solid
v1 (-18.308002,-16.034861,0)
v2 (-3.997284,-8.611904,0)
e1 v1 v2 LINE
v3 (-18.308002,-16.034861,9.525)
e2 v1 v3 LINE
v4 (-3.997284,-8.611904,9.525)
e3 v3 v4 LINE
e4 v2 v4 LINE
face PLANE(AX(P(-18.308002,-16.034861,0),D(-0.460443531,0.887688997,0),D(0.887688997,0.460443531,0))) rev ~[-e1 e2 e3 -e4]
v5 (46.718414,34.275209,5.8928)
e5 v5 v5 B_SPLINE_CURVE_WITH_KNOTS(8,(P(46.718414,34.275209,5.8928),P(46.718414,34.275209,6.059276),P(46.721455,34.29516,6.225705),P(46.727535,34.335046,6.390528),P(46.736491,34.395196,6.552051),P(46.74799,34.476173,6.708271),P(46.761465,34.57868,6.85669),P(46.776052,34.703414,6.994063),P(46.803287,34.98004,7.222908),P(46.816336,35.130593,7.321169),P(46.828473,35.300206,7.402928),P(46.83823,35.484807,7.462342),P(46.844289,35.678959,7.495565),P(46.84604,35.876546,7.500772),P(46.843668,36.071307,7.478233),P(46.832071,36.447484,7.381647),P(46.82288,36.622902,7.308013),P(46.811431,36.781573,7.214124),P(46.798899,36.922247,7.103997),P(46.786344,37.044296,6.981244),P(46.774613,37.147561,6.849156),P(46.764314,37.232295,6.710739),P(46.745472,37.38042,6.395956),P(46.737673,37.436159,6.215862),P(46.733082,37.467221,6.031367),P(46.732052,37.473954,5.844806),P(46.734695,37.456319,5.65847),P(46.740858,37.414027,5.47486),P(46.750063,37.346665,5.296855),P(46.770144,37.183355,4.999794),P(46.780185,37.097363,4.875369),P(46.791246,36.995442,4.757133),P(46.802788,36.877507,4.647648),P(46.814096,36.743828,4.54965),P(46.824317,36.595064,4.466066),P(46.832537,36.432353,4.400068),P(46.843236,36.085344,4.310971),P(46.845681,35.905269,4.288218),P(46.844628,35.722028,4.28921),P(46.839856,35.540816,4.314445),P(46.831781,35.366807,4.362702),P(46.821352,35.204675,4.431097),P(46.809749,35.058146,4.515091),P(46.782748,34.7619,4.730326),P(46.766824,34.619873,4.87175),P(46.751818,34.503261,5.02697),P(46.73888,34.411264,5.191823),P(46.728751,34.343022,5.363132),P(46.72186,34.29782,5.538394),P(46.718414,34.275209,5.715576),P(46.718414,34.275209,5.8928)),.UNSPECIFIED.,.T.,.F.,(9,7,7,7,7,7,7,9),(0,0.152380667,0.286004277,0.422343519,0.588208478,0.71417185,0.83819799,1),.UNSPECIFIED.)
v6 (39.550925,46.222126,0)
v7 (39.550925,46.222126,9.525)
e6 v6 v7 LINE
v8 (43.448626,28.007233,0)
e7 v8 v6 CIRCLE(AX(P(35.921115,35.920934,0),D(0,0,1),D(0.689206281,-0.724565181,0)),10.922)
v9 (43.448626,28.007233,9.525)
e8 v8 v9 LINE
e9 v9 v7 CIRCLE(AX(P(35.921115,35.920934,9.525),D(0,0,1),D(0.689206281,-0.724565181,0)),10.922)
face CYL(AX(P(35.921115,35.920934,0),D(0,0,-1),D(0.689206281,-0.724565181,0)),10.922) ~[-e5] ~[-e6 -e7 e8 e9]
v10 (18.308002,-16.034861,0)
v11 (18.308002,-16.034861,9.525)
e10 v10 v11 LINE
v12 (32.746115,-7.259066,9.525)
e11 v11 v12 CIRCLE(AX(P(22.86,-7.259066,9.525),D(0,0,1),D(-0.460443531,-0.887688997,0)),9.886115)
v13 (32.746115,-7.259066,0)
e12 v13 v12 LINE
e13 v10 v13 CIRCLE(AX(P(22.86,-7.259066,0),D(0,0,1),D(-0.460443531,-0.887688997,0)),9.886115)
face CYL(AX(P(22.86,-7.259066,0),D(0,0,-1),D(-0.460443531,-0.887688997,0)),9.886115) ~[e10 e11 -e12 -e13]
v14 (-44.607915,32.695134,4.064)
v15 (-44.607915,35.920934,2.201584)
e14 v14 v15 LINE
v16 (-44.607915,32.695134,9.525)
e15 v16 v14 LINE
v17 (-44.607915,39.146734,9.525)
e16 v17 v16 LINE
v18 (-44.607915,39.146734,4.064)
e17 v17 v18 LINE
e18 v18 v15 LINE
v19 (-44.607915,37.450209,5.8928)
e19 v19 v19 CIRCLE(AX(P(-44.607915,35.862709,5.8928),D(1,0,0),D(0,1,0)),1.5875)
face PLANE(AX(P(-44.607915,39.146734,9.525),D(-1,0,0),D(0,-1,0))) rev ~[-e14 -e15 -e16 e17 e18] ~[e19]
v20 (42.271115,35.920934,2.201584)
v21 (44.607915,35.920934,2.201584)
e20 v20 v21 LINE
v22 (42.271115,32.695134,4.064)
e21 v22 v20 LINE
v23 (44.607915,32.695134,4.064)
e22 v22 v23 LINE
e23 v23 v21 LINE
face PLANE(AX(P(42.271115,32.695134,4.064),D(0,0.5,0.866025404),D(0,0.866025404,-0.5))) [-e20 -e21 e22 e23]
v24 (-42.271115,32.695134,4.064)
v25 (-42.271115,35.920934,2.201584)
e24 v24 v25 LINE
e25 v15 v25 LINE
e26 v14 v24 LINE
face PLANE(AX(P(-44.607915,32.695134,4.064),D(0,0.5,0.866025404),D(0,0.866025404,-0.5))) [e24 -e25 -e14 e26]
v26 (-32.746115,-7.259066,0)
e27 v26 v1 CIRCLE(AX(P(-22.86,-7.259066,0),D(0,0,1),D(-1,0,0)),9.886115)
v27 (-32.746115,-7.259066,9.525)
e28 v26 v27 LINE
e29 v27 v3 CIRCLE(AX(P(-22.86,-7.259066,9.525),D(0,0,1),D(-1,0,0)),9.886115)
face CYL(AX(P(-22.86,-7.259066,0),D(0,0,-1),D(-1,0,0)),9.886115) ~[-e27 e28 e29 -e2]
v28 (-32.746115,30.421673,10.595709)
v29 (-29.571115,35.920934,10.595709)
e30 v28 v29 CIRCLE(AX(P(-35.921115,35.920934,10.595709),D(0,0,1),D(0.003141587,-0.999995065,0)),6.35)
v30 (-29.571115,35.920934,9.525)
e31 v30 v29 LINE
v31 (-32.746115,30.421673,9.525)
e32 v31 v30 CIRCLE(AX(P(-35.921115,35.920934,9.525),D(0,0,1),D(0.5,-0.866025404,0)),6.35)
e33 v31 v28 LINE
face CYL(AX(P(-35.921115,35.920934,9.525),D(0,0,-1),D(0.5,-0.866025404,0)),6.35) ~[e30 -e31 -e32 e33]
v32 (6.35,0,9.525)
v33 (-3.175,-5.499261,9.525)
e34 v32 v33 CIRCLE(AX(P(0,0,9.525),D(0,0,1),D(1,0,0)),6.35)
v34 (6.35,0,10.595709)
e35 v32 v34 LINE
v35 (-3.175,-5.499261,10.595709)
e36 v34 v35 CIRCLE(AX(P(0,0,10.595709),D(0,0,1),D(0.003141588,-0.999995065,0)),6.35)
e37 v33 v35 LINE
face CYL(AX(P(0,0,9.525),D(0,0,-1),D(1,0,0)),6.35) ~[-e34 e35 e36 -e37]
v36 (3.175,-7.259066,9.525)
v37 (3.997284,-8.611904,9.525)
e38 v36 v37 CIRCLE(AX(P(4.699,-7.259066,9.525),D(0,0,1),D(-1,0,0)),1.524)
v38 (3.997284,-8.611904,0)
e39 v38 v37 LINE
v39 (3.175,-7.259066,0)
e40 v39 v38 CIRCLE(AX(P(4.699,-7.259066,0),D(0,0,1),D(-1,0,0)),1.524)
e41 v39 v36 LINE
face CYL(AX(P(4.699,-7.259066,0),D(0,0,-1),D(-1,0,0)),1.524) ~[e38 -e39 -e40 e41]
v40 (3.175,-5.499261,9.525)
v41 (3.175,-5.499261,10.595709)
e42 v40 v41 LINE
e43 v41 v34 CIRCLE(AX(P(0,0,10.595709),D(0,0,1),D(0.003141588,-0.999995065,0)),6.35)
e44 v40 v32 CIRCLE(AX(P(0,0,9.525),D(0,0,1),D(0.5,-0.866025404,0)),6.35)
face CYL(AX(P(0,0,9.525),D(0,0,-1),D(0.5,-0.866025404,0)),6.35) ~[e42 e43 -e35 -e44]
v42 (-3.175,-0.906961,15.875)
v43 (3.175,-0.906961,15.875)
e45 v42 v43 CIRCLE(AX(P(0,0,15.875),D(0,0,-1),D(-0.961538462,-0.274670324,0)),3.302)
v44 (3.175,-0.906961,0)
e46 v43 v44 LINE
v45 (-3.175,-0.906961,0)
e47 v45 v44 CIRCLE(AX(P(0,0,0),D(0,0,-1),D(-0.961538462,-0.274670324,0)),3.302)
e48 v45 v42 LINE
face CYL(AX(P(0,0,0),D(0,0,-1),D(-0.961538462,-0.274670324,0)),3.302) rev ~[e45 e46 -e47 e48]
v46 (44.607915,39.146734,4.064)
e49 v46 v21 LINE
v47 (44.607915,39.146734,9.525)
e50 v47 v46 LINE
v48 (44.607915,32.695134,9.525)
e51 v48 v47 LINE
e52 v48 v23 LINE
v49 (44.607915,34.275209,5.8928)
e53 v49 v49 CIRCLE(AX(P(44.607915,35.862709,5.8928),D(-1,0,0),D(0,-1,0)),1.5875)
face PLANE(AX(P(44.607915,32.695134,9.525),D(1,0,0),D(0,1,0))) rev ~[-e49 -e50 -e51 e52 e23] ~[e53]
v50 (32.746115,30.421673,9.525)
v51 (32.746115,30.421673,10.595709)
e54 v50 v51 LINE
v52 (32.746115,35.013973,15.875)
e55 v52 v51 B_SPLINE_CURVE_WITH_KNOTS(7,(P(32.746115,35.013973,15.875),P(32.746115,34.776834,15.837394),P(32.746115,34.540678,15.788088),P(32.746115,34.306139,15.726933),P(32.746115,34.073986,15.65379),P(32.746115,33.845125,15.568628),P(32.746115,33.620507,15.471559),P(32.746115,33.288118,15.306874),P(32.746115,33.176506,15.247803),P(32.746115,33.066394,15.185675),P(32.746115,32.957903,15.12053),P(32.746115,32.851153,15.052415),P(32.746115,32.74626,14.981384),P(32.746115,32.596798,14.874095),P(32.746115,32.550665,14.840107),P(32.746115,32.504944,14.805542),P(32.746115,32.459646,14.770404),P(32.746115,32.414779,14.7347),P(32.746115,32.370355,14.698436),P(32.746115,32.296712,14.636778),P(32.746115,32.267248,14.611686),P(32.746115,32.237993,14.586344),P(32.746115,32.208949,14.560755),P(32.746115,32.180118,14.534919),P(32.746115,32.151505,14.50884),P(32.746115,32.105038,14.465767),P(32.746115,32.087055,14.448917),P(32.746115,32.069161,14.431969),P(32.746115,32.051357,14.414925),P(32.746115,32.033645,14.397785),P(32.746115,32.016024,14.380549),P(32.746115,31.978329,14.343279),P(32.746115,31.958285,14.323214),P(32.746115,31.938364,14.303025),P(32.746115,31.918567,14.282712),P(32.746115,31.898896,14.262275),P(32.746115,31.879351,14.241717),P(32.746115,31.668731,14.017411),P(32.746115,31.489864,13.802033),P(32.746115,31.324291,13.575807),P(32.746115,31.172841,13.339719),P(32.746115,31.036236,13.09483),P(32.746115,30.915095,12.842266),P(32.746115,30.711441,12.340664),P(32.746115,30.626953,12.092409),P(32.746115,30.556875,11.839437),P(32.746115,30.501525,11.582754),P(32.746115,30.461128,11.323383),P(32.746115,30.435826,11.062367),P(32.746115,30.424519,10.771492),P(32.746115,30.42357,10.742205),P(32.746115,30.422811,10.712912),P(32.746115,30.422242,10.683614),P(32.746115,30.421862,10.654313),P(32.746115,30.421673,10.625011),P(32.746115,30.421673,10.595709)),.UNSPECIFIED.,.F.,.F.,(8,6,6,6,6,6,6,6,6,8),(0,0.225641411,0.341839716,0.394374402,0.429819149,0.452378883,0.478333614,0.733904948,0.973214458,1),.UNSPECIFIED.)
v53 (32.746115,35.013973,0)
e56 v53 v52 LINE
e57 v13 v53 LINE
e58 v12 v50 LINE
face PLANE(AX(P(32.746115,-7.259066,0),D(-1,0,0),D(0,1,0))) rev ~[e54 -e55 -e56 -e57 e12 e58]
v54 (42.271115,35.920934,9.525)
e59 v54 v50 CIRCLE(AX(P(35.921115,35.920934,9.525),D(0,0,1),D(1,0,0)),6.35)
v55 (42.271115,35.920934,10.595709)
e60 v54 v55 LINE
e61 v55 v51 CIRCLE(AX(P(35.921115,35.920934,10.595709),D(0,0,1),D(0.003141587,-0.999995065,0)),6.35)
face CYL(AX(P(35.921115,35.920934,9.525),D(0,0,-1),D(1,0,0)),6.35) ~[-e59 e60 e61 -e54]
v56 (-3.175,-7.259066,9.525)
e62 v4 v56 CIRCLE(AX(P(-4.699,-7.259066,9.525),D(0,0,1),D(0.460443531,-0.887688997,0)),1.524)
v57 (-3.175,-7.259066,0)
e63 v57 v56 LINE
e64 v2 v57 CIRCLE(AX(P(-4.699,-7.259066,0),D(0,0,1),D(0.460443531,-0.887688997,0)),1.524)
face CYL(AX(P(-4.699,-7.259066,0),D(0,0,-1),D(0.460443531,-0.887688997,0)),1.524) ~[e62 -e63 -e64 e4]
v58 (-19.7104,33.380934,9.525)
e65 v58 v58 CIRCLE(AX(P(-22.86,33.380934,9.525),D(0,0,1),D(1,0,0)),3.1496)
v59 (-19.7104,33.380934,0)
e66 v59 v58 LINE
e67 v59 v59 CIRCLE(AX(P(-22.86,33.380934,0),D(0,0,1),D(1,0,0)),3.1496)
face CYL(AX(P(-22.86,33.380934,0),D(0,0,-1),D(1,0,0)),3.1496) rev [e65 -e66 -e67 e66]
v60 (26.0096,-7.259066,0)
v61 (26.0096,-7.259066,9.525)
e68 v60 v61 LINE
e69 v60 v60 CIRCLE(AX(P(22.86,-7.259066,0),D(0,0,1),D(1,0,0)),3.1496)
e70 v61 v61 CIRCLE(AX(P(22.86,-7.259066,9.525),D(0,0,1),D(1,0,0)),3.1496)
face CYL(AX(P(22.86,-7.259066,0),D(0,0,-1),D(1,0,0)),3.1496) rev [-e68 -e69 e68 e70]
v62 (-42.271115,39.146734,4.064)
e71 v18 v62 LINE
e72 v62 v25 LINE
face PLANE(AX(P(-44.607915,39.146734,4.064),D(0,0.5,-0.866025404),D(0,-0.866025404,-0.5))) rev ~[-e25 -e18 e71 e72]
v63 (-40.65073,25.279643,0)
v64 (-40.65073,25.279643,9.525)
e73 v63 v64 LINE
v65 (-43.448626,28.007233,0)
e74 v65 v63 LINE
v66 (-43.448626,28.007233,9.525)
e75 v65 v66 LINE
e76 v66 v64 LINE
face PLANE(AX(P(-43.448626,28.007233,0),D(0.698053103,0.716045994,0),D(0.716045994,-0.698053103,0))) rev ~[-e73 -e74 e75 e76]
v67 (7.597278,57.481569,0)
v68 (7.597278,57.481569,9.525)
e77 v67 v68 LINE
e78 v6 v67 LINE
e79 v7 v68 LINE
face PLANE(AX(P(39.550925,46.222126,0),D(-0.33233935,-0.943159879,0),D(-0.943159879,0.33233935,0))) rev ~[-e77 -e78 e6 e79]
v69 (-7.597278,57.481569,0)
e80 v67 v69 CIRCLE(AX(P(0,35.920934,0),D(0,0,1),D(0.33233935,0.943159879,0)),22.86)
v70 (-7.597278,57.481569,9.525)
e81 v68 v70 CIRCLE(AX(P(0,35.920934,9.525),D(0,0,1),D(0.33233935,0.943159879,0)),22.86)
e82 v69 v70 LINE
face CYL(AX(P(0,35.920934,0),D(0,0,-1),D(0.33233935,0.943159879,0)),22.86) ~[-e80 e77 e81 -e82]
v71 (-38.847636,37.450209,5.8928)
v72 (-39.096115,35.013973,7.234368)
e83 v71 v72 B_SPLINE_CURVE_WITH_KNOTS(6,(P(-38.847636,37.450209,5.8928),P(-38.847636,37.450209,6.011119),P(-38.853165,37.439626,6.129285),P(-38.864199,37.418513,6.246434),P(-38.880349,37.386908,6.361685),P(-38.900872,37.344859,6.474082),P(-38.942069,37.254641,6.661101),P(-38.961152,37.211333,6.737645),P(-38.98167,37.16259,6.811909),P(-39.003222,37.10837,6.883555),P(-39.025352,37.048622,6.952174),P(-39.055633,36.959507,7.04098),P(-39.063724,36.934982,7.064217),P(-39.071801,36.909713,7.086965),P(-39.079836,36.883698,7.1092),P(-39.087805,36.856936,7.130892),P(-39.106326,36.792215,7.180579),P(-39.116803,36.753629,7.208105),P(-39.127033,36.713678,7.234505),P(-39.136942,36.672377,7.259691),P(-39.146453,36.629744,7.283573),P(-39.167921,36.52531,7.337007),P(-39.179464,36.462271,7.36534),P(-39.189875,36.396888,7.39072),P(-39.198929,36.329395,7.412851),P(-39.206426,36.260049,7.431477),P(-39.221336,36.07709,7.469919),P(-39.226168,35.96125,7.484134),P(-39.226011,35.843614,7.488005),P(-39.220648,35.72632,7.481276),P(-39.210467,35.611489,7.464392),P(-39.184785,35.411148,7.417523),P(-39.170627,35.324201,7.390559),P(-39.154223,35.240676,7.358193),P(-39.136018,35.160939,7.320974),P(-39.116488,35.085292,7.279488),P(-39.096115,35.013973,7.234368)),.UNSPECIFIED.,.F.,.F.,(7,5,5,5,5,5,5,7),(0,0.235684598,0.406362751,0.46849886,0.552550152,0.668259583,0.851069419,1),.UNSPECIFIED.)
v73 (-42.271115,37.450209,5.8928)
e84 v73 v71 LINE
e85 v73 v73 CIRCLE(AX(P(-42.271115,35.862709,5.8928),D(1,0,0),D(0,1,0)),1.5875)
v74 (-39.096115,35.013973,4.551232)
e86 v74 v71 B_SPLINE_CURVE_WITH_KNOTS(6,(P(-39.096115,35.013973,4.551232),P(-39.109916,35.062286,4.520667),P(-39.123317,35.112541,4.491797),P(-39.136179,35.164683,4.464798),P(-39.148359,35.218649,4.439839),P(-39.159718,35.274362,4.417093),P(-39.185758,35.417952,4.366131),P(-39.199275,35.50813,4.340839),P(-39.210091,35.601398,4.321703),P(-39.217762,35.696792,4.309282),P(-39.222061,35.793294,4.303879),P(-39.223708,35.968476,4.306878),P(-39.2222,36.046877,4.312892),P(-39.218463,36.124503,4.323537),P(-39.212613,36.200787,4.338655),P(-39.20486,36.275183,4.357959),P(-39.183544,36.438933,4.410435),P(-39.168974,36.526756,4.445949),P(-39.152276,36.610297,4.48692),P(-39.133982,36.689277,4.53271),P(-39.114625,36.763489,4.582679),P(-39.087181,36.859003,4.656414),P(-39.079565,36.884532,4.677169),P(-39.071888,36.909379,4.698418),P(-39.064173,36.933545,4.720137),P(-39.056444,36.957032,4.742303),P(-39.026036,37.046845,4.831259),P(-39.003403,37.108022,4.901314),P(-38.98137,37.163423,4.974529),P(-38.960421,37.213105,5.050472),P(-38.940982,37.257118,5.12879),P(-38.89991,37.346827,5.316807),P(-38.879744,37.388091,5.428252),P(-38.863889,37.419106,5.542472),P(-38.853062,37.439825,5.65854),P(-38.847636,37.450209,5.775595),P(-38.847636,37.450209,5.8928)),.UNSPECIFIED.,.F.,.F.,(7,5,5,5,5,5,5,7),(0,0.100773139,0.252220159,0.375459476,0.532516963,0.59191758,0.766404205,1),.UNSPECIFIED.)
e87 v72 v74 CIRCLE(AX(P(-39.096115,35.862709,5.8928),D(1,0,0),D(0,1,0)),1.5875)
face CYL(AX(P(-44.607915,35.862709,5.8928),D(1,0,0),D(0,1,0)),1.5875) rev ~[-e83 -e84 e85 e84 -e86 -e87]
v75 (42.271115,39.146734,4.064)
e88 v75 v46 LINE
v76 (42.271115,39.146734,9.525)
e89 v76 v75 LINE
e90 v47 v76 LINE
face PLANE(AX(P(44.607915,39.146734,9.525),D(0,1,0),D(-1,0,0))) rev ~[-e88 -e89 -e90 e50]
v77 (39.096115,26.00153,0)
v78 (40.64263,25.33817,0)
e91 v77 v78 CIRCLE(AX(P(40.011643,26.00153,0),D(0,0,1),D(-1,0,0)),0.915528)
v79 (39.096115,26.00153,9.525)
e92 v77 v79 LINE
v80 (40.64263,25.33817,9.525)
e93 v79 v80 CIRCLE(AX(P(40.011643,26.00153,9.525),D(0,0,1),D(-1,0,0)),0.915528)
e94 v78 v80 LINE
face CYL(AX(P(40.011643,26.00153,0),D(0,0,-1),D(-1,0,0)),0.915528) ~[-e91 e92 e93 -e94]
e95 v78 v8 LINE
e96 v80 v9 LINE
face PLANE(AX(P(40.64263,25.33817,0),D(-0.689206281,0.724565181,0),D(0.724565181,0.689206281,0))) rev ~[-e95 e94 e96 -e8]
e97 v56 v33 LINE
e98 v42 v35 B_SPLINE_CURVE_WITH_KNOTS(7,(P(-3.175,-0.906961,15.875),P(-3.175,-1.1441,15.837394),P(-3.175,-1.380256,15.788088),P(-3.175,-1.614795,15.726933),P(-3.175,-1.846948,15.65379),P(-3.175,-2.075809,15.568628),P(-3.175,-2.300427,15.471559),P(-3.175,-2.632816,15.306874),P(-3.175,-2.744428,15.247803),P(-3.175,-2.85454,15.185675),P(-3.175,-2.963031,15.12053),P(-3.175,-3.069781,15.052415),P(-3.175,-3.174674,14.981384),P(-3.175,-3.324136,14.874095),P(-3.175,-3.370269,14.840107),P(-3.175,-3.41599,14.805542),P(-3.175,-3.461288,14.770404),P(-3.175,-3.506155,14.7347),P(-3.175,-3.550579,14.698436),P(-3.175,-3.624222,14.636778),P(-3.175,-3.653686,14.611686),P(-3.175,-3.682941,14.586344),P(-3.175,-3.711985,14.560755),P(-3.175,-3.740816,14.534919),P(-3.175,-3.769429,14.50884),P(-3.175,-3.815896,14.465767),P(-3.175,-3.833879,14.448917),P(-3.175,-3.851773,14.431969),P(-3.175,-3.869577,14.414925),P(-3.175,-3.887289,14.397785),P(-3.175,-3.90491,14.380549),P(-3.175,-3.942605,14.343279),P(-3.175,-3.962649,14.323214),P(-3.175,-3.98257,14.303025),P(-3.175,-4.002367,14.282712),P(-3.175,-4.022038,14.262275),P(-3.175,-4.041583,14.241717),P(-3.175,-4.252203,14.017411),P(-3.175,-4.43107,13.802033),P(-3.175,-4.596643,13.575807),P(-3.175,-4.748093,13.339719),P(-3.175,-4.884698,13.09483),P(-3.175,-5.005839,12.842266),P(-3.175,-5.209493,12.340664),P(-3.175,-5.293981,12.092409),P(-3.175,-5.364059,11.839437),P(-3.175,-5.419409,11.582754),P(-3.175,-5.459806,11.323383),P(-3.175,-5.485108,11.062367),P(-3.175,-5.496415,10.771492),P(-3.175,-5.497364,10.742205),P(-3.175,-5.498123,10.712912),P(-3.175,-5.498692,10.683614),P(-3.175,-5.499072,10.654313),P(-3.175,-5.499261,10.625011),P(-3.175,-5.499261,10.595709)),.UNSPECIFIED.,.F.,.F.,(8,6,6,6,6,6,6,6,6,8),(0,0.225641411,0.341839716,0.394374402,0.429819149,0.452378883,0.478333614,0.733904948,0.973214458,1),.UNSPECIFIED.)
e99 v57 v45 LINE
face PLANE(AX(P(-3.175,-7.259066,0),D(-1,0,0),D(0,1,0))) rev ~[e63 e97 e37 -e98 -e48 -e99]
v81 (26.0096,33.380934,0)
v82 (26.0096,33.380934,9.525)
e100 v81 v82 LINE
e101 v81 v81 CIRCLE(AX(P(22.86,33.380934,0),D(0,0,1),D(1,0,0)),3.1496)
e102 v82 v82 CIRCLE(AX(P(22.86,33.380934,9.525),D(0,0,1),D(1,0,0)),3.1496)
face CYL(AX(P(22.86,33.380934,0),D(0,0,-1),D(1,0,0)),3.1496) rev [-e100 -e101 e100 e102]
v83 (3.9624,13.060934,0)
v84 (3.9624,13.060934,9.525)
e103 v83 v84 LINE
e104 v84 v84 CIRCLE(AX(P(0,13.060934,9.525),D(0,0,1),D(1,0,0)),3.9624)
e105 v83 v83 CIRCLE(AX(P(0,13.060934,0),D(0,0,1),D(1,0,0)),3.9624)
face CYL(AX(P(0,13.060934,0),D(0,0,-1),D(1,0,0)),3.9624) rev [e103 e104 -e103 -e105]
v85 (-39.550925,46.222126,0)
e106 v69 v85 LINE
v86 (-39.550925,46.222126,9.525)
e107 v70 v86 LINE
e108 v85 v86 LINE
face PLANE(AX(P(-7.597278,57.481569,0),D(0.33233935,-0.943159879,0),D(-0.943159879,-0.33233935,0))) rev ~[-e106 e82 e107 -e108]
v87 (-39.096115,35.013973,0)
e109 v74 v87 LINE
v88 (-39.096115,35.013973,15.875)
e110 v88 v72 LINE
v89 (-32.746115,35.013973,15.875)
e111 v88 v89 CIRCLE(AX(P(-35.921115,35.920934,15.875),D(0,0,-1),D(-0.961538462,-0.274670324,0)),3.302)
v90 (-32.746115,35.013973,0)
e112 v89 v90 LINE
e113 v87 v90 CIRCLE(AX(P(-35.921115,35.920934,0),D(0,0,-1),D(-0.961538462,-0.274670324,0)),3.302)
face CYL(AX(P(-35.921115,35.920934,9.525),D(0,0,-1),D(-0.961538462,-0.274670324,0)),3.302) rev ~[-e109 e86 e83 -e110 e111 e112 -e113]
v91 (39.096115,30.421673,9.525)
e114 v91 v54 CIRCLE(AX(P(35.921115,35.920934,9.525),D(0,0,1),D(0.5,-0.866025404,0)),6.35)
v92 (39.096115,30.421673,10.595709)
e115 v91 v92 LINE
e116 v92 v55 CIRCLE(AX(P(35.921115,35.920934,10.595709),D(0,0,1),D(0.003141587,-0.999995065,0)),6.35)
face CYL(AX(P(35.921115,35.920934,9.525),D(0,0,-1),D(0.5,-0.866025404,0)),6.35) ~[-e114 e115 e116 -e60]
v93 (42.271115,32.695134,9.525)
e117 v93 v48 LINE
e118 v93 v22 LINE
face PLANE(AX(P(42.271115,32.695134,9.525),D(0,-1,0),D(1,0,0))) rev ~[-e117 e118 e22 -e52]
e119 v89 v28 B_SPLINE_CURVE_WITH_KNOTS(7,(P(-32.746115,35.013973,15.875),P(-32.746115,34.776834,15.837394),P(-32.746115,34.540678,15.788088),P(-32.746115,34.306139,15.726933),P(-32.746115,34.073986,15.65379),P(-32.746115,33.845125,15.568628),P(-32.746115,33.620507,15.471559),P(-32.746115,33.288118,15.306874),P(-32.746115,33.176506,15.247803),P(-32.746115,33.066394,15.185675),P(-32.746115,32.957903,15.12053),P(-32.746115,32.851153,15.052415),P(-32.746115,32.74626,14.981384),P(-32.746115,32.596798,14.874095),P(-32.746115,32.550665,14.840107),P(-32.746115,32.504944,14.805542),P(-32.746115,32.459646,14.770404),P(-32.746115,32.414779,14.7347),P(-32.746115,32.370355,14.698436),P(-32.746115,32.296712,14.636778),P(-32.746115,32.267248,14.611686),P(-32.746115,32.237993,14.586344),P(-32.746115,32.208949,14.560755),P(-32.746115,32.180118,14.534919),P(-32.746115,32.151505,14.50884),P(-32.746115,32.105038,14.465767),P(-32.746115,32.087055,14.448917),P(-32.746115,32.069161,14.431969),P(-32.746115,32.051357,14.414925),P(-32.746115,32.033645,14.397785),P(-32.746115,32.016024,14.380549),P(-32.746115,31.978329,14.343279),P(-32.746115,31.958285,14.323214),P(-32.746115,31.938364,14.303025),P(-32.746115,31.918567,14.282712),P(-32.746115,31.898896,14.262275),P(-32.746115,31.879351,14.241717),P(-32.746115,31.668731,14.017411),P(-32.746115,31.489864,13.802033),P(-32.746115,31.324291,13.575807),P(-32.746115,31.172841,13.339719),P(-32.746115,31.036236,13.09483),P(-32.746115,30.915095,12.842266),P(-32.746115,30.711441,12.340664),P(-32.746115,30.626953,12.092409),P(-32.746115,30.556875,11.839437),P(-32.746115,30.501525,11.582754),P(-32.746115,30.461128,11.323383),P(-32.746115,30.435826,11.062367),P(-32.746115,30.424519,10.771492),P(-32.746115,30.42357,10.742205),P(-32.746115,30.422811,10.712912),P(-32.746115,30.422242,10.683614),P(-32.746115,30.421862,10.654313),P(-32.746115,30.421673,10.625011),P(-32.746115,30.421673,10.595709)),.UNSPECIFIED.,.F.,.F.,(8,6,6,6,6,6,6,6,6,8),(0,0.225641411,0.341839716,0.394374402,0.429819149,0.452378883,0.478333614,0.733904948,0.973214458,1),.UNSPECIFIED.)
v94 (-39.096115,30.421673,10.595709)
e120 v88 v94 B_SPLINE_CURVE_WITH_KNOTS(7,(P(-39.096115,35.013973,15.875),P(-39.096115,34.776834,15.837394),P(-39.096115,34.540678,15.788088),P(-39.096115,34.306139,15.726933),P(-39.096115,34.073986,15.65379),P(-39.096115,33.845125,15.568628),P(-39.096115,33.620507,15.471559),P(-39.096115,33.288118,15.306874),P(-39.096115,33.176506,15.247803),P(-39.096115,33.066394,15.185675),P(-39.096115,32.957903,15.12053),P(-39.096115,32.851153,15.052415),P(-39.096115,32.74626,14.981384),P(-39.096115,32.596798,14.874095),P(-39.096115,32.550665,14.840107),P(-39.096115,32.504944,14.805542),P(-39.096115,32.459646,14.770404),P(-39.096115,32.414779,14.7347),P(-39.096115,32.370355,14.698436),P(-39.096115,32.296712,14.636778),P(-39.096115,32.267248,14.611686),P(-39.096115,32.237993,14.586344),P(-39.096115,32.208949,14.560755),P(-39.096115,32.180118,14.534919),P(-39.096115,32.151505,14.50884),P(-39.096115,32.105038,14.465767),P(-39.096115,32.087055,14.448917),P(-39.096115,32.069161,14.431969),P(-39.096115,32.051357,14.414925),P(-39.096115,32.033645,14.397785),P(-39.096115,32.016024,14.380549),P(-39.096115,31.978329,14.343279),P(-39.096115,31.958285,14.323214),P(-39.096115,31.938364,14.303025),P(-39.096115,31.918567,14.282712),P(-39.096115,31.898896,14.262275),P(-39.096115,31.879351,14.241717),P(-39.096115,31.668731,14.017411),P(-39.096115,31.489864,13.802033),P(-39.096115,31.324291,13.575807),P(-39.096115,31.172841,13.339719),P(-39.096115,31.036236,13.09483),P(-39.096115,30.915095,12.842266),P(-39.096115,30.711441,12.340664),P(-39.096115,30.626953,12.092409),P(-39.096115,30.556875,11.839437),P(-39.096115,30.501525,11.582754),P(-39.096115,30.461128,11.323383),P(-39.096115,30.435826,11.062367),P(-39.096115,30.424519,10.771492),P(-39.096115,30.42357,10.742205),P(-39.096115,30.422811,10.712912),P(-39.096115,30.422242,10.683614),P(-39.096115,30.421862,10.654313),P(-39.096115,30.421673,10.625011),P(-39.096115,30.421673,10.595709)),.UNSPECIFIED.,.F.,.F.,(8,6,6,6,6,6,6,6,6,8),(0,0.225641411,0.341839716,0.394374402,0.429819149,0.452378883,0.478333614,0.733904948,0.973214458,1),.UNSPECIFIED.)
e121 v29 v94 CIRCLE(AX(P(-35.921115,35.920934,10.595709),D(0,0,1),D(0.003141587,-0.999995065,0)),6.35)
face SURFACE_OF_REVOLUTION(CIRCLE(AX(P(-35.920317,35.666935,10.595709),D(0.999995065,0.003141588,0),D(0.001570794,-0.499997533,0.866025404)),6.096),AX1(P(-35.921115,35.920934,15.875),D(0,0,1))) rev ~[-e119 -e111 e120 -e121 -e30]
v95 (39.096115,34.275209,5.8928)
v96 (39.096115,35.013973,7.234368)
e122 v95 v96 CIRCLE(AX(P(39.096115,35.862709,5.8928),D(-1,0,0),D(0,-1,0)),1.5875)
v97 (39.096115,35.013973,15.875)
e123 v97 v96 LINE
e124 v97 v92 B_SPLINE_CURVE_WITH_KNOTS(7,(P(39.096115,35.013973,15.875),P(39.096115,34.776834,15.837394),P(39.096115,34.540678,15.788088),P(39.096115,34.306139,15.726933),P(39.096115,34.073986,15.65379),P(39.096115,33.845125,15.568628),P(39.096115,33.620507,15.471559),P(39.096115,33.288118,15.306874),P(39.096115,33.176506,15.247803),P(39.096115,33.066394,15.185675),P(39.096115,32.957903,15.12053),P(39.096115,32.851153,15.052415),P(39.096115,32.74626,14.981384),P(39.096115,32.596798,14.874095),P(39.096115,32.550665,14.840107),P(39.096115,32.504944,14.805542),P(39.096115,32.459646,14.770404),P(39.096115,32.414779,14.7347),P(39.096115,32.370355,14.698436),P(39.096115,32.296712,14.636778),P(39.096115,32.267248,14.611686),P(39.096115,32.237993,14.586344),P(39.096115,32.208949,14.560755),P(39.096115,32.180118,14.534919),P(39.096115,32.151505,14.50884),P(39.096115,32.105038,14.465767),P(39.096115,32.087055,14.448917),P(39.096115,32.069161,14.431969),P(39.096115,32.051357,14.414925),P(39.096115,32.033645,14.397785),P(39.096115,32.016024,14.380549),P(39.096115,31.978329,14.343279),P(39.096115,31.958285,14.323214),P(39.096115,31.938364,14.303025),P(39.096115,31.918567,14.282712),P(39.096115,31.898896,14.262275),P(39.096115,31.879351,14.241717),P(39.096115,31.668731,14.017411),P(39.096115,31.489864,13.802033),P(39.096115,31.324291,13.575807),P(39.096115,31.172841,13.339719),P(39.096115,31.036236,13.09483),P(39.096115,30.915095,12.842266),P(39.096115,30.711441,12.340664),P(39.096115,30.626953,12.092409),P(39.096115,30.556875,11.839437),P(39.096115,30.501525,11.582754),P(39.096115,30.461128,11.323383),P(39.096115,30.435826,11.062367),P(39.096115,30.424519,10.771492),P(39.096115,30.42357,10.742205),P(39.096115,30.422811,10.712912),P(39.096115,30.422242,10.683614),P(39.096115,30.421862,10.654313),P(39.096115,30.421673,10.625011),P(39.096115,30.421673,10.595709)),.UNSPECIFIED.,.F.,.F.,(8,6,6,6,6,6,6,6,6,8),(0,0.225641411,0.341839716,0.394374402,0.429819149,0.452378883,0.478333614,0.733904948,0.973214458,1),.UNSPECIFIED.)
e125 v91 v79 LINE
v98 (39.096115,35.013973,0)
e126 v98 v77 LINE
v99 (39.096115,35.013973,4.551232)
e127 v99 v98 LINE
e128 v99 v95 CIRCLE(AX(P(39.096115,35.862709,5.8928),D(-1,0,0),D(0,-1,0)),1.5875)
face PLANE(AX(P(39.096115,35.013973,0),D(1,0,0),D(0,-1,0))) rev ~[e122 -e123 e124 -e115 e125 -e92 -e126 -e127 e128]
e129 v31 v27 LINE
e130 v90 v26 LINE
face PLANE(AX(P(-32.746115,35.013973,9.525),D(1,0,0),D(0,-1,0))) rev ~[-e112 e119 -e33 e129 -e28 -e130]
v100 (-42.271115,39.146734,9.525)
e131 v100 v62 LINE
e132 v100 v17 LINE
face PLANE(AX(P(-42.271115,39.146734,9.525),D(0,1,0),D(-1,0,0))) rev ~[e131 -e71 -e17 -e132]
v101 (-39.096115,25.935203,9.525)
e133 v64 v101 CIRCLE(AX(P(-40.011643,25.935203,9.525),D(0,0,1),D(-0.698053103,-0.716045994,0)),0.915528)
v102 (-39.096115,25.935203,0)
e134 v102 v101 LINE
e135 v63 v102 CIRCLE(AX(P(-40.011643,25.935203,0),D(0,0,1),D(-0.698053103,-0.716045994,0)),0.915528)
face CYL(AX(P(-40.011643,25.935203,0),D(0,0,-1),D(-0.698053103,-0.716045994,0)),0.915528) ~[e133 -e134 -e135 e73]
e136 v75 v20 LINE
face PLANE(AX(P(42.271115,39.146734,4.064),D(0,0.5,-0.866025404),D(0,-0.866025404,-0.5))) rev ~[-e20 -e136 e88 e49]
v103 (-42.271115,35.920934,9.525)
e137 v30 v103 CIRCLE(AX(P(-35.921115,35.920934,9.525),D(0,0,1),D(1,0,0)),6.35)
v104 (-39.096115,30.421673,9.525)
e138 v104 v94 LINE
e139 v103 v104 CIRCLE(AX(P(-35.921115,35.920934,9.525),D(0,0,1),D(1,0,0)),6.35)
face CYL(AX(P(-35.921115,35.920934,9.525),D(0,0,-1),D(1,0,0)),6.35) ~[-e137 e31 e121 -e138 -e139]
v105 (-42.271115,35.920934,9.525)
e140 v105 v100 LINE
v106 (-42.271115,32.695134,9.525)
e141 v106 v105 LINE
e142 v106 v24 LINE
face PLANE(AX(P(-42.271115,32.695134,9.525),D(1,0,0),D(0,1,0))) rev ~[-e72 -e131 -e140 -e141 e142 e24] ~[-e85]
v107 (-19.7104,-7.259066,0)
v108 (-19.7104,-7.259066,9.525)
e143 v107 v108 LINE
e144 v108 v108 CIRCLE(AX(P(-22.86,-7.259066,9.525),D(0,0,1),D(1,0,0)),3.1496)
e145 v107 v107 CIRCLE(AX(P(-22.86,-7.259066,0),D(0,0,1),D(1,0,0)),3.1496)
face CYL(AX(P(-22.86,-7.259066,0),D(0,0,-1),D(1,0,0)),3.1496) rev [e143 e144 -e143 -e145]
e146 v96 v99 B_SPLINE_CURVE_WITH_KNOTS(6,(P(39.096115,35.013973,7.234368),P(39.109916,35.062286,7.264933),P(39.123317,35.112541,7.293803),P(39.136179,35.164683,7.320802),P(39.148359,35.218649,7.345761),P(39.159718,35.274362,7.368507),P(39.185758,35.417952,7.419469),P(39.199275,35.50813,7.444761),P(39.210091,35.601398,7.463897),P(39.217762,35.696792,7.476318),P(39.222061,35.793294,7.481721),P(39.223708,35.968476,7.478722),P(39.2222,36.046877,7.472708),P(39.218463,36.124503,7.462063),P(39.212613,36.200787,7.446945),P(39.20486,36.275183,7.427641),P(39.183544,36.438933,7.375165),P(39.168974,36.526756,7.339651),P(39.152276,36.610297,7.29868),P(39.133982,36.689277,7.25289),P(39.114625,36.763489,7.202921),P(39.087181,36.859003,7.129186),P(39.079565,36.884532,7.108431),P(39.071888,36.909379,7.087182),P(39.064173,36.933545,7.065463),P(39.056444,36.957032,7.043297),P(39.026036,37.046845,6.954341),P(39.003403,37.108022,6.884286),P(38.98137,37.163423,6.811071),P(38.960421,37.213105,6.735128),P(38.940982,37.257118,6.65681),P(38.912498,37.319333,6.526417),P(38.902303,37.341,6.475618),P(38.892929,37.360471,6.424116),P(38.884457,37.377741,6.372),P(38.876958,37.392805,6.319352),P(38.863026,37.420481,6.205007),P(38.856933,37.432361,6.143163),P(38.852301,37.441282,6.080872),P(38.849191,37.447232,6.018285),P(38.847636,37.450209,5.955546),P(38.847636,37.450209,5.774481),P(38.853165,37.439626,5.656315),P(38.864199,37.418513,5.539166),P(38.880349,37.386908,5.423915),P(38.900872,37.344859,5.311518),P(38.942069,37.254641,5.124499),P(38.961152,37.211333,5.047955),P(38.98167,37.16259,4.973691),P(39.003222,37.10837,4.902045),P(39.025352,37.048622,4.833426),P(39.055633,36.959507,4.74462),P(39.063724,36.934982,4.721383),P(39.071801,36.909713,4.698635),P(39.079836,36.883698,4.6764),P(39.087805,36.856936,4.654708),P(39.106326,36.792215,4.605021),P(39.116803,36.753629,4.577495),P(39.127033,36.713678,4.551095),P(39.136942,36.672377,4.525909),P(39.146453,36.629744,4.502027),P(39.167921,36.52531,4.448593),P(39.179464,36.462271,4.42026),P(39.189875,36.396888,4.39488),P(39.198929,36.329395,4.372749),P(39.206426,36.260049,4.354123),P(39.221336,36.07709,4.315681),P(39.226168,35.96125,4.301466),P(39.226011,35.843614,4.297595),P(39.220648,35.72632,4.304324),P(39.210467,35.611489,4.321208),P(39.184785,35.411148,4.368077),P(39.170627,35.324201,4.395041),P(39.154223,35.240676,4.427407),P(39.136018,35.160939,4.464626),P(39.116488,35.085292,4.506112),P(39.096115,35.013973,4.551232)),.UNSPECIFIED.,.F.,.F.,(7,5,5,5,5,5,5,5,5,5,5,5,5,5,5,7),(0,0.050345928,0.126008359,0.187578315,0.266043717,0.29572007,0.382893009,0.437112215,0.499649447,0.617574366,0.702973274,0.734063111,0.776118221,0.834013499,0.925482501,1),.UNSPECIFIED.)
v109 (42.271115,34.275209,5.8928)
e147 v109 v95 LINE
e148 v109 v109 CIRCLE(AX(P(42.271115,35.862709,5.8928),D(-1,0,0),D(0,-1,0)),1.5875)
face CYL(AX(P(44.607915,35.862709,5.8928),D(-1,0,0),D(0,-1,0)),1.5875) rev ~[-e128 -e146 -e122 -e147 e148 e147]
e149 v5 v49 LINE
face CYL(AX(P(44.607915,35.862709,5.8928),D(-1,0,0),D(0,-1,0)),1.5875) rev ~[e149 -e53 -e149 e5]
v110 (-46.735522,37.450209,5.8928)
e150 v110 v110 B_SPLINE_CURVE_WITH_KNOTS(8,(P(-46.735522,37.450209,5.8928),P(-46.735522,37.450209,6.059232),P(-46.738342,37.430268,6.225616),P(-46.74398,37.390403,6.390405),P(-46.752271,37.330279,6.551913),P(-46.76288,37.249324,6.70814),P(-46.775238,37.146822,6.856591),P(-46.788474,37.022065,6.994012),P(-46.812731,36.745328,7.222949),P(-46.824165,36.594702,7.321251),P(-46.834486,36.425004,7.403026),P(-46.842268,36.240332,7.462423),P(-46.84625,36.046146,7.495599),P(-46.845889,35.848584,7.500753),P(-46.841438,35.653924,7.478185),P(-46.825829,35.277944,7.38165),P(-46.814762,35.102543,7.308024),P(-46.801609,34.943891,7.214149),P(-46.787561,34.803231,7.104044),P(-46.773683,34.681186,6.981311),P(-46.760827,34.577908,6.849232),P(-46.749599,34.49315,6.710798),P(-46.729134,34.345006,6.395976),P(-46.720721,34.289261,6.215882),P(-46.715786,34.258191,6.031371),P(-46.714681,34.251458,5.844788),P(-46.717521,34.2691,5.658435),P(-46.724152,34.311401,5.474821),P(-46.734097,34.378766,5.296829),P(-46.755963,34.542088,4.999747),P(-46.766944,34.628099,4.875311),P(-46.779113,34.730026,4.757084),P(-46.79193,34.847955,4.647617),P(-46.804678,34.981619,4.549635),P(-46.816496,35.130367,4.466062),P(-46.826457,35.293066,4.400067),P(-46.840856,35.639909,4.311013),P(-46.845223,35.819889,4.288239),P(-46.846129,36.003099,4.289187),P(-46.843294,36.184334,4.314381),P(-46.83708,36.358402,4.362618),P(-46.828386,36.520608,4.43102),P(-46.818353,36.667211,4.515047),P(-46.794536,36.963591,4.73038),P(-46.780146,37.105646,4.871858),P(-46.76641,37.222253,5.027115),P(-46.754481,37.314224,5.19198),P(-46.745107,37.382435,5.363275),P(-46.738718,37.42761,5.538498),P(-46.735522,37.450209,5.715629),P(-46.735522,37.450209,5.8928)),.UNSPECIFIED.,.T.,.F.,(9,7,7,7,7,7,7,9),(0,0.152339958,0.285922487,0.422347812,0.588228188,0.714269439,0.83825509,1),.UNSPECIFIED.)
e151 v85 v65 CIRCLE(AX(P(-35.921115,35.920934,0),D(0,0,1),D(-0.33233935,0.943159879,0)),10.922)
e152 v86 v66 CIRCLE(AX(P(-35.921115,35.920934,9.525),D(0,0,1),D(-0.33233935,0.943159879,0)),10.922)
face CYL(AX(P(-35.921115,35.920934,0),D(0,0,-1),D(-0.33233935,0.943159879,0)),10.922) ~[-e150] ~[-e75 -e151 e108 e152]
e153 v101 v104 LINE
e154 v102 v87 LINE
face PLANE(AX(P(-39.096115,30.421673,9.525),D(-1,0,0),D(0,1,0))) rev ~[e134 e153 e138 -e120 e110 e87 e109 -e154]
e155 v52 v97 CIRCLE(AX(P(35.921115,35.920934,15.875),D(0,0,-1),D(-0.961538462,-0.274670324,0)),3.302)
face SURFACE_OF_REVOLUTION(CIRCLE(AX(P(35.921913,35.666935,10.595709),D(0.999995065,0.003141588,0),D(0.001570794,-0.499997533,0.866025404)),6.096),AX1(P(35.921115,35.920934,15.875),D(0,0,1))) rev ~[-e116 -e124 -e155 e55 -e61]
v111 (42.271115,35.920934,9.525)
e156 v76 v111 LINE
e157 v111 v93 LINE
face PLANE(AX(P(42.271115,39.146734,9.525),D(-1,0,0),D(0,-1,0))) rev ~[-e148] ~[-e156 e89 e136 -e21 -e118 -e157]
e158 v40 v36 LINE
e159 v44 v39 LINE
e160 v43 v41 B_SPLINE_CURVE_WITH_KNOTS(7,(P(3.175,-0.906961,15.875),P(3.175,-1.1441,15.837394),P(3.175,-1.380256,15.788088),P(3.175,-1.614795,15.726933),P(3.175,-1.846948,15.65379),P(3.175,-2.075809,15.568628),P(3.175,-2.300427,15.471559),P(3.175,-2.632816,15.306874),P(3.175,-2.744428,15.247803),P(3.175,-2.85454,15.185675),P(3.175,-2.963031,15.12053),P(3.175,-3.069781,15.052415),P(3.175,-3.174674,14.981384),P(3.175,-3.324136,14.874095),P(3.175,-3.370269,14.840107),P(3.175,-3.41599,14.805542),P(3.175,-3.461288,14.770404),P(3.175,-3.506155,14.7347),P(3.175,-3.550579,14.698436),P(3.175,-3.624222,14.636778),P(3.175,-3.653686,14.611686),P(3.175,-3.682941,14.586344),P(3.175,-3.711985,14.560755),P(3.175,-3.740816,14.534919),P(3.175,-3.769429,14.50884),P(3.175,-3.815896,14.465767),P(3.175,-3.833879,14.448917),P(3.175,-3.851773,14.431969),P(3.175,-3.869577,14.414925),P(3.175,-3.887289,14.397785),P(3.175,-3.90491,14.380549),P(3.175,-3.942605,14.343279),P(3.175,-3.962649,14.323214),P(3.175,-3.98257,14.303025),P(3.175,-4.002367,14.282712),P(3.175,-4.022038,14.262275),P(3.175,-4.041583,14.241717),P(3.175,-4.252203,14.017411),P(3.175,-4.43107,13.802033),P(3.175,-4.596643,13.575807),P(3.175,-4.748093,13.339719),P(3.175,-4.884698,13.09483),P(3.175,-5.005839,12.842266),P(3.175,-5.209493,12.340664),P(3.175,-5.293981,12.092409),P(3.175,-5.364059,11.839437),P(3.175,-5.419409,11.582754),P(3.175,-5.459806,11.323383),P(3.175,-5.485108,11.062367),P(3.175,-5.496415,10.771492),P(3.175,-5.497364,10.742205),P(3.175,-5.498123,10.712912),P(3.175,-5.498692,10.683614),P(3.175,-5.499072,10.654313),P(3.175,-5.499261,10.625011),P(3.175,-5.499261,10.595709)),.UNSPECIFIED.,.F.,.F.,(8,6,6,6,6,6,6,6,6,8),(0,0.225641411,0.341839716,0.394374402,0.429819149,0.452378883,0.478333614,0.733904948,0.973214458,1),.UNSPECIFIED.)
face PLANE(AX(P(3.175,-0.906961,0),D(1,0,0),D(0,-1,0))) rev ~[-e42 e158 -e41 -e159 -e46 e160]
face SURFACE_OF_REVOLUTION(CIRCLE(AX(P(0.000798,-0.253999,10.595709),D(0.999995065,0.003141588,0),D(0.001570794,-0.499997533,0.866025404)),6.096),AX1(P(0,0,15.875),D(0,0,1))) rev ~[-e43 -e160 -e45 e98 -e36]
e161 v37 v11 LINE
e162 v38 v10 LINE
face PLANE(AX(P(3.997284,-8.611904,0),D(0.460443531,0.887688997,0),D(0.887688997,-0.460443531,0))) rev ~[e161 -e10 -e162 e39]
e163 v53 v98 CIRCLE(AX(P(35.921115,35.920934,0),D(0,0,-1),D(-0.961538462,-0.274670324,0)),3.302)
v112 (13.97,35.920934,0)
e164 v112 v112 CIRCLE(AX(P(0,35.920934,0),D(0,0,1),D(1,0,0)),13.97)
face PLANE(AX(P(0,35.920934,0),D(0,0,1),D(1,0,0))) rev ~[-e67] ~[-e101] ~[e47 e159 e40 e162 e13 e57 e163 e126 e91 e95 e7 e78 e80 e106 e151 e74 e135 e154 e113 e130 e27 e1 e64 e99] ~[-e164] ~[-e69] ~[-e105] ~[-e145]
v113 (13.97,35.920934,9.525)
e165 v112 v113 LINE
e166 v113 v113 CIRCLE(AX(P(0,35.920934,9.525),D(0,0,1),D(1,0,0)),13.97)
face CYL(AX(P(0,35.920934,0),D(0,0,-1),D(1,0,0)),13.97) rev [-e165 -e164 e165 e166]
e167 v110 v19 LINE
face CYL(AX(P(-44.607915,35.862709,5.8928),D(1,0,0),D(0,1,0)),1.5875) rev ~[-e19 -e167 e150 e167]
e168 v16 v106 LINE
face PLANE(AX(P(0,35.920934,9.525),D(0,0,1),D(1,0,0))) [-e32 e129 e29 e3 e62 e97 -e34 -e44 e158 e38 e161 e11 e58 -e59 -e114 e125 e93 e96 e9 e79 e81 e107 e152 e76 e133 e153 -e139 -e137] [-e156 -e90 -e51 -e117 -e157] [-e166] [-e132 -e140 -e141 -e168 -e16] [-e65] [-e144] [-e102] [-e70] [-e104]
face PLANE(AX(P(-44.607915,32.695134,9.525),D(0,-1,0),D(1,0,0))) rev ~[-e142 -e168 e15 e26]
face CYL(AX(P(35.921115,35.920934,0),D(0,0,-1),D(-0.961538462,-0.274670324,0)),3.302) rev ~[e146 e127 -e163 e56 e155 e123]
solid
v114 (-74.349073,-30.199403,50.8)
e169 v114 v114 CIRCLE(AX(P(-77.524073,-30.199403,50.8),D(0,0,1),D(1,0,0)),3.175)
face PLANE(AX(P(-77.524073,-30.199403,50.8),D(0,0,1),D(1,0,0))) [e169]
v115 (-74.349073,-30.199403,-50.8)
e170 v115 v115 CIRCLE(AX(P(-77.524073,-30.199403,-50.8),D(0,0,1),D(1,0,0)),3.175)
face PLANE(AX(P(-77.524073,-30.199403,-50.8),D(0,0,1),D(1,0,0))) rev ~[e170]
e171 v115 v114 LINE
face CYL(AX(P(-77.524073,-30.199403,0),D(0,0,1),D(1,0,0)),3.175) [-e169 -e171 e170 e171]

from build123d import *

# Parameters (mm, degrees)
F0_R        = 3.1496
F0_R_2      = 3.9624
F0_R_3      = 16.51
F1_DEPTH    = 9.525
F0_R_4      = 13.97
F2_DEPTH    = 9.525
F5_DEPTH    = 8.636
F6_T1_DEPTH = 2.3368
F6_T3_DEPTH = 2.3368
F7_DEPTH    = 6.35
F8_T2_ANGLE = 359.64
F8_T4_ANGLE = 359.64
F8_T6_ANGLE = 359.64
F10_R       = 1.5875
F11_DEPTH   = 6.35
F9_R        = 1.5875
F12_DEPTH   = 6.35
F13_R       = 3.175
F14_DEPTH   = 50.8


# Not quite as in the source:
# - a fillet or chamfer that OpenCascade refuses, or shapes differently, is made with other operations: its cross-section is extruded or revolved along the edge and cut away or added
# - a feature names something its author has since deleted; it is built from what else it names


with BuildPart() as f1:
    # F0 (on Top) → F1 (new body)
    with BuildSketch(Plane.XY):
        with BuildLine():
            ThreePointArc((-3.175, -0.9069614104), (0, 3.302), (3.175, -0.9069614104))
            Line((3.175, -0.9069614104), (3.175, -7.259066))
            ThreePointArc((3.175, -7.259066), (3.3966960618, -8.05063435), (3.9972840586, -8.6119040308))
            Line((3.9972840586, -8.6119040308), (18.3080023151, -16.0348614764))
            ThreePointArc((18.3080023151, -16.0348614764), (27.9948659534, -15.7070492391), (32.7461149683, -7.259066))
            Line((32.7461149683, -7.259066), (32.7461149683, 35.0139725896))
            ThreePointArc((32.7461149683, 35.0139725896), (35.9211149683, 39.222934), (39.0961149683, 35.0139725896))
            Line((39.0961149683, 35.0139725896), (39.0961149683, 26.0015298192))
            ThreePointArc((39.0961149683, 26.0015298192), (39.6507379199, 25.1601388581), (40.6426301361, 25.3381703138))
            Line((40.6426301361, 25.3381703138), (43.4486259704, 28.0072330887))
            ThreePointArc((43.4486259704, 28.0072330887), (46.6013320921, 38.2063324748), (39.5509253491, 46.2221261931))
            Line((39.5509253491, 46.2221261931), (7.5972775411, 57.4815688228))
            ThreePointArc((7.5972775411, 57.4815688228), (0, 58.780934), (-7.5972775411, 57.4815688228))
            Line((-7.5972775411, 57.4815688228), (-39.5509253491, 46.2221261931))
            ThreePointArc((-39.5509253491, 46.2221261931), (-46.6013320921, 38.2063324748), (-43.4486259704, 28.0072330887))
            Line((-43.4486259704, 28.0072330887), (-40.6507296468, 25.2796426444))
            ThreePointArc((-40.6507296468, 25.2796426444), (-39.6559116262, 25.0916112197), (-39.0961149683, 25.9352025975))
            Line((-39.0961149683, 25.9352025975), (-39.0961149683, 35.0139725896))
            ThreePointArc((-39.0961149683, 35.0139725896), (-35.9211149683, 39.222934), (-32.7461149683, 35.0139725896))
            Line((-32.7461149683, 35.0139725896), (-32.7461149683, -7.259066))
            ThreePointArc((-32.7461149683, -7.259066), (-27.9948659534, -15.7070492391), (-18.3080023151, -16.0348614764))
            Line((-18.3080023151, -16.0348614764), (-3.9972840586, -8.6119040308))
            ThreePointArc((-3.9972840586, -8.6119040308), (-3.3966960618, -8.05063435), (-3.175, -7.259066))
            Line((-3.175, -7.259066), (-3.175, -0.9069614104))
        make_face()
        with Locations((-22.86, -7.259066)):
            Circle(F0_R, mode=Mode.SUBTRACT)
        with Locations((22.86, -7.259066)):
            Circle(F0_R, mode=Mode.SUBTRACT)
        with Locations((0, 13.060934)):
            Circle(F0_R_2, mode=Mode.SUBTRACT)
        with Locations((-22.86, 33.380934)):
            Circle(F0_R, mode=Mode.SUBTRACT)
        with Locations((0, 35.920934)):
            Circle(F0_R_3, mode=Mode.SUBTRACT)
        with Locations((22.86, 33.380934)):
            Circle(F0_R, mode=Mode.SUBTRACT)
    extrude(amount=F1_DEPTH)

    # F0 (on Top) → F2 (join, through all)
    with BuildSketch(Plane.XY):
        with Locations((0, 35.920934)):
            Circle(F0_R_3)
        with Locations((0, 35.920934)):
            Circle(F0_R_4, mode=Mode.SUBTRACT)
    extrude(amount=F2_DEPTH)

    # F4 (on face) → F5 (cut)
    with BuildSketch(Plane.XY.offset(9.525)):
        Polygon((-42.2711149683, 32.695134), (-42.2711149683, 35.920934), (-42.2711149683, 39.146734), (-44.6079149683, 39.146734), (-44.6079149683, 32.695134), align=None)
        Polygon((42.2711149683, 39.146734), (42.2711149683, 35.920934), (42.2711149683, 32.695134), (44.6079149683, 32.695134), (44.6079149683, 39.146734), align=None)
    extrude(amount=-F5_DEPTH, mode=Mode.SUBTRACT)

    # F6: chamfer of 3.175 x 5.499261314 on 4 edges, made by hand

    # F6_s2 → F6_t1 (join)
    with BuildSketch(Plane.YZ.offset(-44.6079149683)):
        Polygon((39.146734, 4.064), (33.647472686, 0.889), (39.146734, 0.889), align=None)
        Polygon((32.695134, 4.064), (38.194395314, 0.889), (32.695134, 0.889), align=None)
    extrude(amount=F6_T1_DEPTH)

    # F6_s4 → F6_t3 (join)
    with BuildSketch(Plane.YZ.offset(42.2711149683)):
        Polygon((39.146734, 4.064), (33.647472686, 0.889), (39.146734, 0.889), align=None)
        Polygon((32.695134, 4.064), (38.194395314, 0.889), (32.695134, 0.889), align=None)
    extrude(amount=F6_T3_DEPTH)

    # F3 (on face) → F7 (join)
    with BuildSketch(Plane.XY.offset(9.525)):
        with BuildLine():
            ThreePointArc((-32.7461149683, 30.421672686), (-30.4218536543, 32.745934), (-29.5711149683, 35.920934))
            ThreePointArc((-29.5711149683, 35.920934), (-39.0961149683, 41.420195314), (-39.0961149683, 30.421672686))
            Line((-39.0961149683, 30.421672686), (-39.0961149683, 35.0139725896))
            ThreePointArc((-39.0961149683, 35.0139725896), (-35.9211149683, 39.222934), (-32.7461149683, 35.0139725896))
            Line((-32.7461149683, 35.0139725896), (-32.7461149683, 30.421672686))
        make_face()
        with BuildLine():
            Line((39.0961149683, 35.0139725896), (39.0961149683, 30.421672686))
            ThreePointArc((39.0961149683, 30.421672686), (41.4203762824, 32.745934), (42.2711149683, 35.920934))
            ThreePointArc((42.2711149683, 35.920934), (32.7461149683, 41.420195314), (32.7461149683, 30.421672686))
            Line((32.7461149683, 30.421672686), (32.7461149683, 35.0139725896))
            ThreePointArc((32.7461149683, 35.0139725896), (35.9211149683, 39.222934), (39.0961149683, 35.0139725896))
        make_face()
        with BuildLine():
            ThreePointArc((6.35, 0), (-3.175, 5.499261314), (-3.175, -5.499261314))
            Line((-3.175, -5.499261314), (-3.175, -0.9069614104))
            ThreePointArc((-3.175, -0.9069614104), (0, 3.302), (3.175, -0.9069614104))
            Line((3.175, -0.9069614104), (3.175, -5.499261314))
            ThreePointArc((3.175, -5.499261314), (5.499261314, -3.175), (6.35, 0))
        make_face()
    extrude(amount=F7_DEPTH)

    # F8: fillet of radius 6.096 on 3 edges, made by hand

    # F8_s1 → F8_t2 (revolve, cut)
    with BuildSketch(Plane(origin=(-35.8079122424, -0.1124942441, 0), x_dir=(0, 0, 1), z_dir=(-0.9999950652, -0.0031415875, 0))):
        with BuildLine():
            ThreePointArc((15.875, 32.7316060627), (13.6437091385, 30.5003152012), (10.5957091385, 29.6836060627))
            Line((10.5957091385, 29.6836060627), (15.875, 29.6836060627))
            Line((15.875, 29.6836060627), (15.875, 32.7316060627))
        make_face()
    revolve(axis=Axis((-35.9211149683, 35.920934, 15.875), (0, 0, 1)), revolution_arc=F8_T2_ANGLE, mode=Mode.SUBTRACT)

    # F8_s3 → F8_t4 (revolve, cut)
    with BuildSketch(Plane(origin=(36.0336086421, 0.1132032926, 0), x_dir=(0, 0, 1), z_dir=(-0.9999950652, -0.0031415875, 0))):
        with BuildLine():
            ThreePointArc((15.875, 32.5059074122), (13.6437091385, 30.2746165507), (10.5957091385, 29.4579074122))
            Line((10.5957091385, 29.4579074122), (15.875, 29.4579074122))
            Line((15.875, 29.4579074122), (15.875, 32.5059074122))
        make_face()
    revolve(axis=Axis((35.9211149683, 35.920934, 15.875), (0, 0, 1)), revolution_arc=F8_T4_ANGLE, mode=Mode.SUBTRACT)

    # F8_s5 → F8_t6 (revolve, cut)
    with BuildSketch(Plane(origin=(0, 0, 0), x_dir=(0, 0, 1), z_dir=(-0.9999950652, -0.0031415875, 0))):
        with BuildLine():
            ThreePointArc((15.875, -3.302), (13.6437091385, -5.5332908615), (10.5957091385, -6.35))
            Line((10.5957091385, -6.35), (15.875, -6.35))
            Line((15.875, -6.35), (15.875, -3.302))
        make_face()
    revolve(axis=Axis((0, 0, 15.875), (0, 0, 1)), revolution_arc=F8_T6_ANGLE, mode=Mode.SUBTRACT)

    # F10 (on face) → F11 (cut, symmetric)
    with BuildSketch(Plane(origin=(44.6079149683, 0, 0), x_dir=(0, -1, 0), z_dir=(-1, 0, 0))):
        with Locations((-35.8627085169, 5.8928)):
            Circle(F10_R)
    extrude(amount=F11_DEPTH, both=True, mode=Mode.SUBTRACT)

    # F9 (on face) → F12 (cut, symmetric)
    with BuildSketch(Plane.YZ.offset(-44.6079149683)):
        with Locations((35.8627085169, 5.8928)):
            Circle(F9_R)
    extrude(amount=F12_DEPTH, both=True, mode=Mode.SUBTRACT)


with BuildPart() as f14:
    # F13 (on Top) → F14 (new body, symmetric)
    with BuildSketch(Plane.XY):
        with Locations((-77.524073422, -30.1994029433)):
            Circle(F13_R)
    extrude(amount=F14_DEPTH, both=True)


solid = Compound([f1.part, f14.part])
